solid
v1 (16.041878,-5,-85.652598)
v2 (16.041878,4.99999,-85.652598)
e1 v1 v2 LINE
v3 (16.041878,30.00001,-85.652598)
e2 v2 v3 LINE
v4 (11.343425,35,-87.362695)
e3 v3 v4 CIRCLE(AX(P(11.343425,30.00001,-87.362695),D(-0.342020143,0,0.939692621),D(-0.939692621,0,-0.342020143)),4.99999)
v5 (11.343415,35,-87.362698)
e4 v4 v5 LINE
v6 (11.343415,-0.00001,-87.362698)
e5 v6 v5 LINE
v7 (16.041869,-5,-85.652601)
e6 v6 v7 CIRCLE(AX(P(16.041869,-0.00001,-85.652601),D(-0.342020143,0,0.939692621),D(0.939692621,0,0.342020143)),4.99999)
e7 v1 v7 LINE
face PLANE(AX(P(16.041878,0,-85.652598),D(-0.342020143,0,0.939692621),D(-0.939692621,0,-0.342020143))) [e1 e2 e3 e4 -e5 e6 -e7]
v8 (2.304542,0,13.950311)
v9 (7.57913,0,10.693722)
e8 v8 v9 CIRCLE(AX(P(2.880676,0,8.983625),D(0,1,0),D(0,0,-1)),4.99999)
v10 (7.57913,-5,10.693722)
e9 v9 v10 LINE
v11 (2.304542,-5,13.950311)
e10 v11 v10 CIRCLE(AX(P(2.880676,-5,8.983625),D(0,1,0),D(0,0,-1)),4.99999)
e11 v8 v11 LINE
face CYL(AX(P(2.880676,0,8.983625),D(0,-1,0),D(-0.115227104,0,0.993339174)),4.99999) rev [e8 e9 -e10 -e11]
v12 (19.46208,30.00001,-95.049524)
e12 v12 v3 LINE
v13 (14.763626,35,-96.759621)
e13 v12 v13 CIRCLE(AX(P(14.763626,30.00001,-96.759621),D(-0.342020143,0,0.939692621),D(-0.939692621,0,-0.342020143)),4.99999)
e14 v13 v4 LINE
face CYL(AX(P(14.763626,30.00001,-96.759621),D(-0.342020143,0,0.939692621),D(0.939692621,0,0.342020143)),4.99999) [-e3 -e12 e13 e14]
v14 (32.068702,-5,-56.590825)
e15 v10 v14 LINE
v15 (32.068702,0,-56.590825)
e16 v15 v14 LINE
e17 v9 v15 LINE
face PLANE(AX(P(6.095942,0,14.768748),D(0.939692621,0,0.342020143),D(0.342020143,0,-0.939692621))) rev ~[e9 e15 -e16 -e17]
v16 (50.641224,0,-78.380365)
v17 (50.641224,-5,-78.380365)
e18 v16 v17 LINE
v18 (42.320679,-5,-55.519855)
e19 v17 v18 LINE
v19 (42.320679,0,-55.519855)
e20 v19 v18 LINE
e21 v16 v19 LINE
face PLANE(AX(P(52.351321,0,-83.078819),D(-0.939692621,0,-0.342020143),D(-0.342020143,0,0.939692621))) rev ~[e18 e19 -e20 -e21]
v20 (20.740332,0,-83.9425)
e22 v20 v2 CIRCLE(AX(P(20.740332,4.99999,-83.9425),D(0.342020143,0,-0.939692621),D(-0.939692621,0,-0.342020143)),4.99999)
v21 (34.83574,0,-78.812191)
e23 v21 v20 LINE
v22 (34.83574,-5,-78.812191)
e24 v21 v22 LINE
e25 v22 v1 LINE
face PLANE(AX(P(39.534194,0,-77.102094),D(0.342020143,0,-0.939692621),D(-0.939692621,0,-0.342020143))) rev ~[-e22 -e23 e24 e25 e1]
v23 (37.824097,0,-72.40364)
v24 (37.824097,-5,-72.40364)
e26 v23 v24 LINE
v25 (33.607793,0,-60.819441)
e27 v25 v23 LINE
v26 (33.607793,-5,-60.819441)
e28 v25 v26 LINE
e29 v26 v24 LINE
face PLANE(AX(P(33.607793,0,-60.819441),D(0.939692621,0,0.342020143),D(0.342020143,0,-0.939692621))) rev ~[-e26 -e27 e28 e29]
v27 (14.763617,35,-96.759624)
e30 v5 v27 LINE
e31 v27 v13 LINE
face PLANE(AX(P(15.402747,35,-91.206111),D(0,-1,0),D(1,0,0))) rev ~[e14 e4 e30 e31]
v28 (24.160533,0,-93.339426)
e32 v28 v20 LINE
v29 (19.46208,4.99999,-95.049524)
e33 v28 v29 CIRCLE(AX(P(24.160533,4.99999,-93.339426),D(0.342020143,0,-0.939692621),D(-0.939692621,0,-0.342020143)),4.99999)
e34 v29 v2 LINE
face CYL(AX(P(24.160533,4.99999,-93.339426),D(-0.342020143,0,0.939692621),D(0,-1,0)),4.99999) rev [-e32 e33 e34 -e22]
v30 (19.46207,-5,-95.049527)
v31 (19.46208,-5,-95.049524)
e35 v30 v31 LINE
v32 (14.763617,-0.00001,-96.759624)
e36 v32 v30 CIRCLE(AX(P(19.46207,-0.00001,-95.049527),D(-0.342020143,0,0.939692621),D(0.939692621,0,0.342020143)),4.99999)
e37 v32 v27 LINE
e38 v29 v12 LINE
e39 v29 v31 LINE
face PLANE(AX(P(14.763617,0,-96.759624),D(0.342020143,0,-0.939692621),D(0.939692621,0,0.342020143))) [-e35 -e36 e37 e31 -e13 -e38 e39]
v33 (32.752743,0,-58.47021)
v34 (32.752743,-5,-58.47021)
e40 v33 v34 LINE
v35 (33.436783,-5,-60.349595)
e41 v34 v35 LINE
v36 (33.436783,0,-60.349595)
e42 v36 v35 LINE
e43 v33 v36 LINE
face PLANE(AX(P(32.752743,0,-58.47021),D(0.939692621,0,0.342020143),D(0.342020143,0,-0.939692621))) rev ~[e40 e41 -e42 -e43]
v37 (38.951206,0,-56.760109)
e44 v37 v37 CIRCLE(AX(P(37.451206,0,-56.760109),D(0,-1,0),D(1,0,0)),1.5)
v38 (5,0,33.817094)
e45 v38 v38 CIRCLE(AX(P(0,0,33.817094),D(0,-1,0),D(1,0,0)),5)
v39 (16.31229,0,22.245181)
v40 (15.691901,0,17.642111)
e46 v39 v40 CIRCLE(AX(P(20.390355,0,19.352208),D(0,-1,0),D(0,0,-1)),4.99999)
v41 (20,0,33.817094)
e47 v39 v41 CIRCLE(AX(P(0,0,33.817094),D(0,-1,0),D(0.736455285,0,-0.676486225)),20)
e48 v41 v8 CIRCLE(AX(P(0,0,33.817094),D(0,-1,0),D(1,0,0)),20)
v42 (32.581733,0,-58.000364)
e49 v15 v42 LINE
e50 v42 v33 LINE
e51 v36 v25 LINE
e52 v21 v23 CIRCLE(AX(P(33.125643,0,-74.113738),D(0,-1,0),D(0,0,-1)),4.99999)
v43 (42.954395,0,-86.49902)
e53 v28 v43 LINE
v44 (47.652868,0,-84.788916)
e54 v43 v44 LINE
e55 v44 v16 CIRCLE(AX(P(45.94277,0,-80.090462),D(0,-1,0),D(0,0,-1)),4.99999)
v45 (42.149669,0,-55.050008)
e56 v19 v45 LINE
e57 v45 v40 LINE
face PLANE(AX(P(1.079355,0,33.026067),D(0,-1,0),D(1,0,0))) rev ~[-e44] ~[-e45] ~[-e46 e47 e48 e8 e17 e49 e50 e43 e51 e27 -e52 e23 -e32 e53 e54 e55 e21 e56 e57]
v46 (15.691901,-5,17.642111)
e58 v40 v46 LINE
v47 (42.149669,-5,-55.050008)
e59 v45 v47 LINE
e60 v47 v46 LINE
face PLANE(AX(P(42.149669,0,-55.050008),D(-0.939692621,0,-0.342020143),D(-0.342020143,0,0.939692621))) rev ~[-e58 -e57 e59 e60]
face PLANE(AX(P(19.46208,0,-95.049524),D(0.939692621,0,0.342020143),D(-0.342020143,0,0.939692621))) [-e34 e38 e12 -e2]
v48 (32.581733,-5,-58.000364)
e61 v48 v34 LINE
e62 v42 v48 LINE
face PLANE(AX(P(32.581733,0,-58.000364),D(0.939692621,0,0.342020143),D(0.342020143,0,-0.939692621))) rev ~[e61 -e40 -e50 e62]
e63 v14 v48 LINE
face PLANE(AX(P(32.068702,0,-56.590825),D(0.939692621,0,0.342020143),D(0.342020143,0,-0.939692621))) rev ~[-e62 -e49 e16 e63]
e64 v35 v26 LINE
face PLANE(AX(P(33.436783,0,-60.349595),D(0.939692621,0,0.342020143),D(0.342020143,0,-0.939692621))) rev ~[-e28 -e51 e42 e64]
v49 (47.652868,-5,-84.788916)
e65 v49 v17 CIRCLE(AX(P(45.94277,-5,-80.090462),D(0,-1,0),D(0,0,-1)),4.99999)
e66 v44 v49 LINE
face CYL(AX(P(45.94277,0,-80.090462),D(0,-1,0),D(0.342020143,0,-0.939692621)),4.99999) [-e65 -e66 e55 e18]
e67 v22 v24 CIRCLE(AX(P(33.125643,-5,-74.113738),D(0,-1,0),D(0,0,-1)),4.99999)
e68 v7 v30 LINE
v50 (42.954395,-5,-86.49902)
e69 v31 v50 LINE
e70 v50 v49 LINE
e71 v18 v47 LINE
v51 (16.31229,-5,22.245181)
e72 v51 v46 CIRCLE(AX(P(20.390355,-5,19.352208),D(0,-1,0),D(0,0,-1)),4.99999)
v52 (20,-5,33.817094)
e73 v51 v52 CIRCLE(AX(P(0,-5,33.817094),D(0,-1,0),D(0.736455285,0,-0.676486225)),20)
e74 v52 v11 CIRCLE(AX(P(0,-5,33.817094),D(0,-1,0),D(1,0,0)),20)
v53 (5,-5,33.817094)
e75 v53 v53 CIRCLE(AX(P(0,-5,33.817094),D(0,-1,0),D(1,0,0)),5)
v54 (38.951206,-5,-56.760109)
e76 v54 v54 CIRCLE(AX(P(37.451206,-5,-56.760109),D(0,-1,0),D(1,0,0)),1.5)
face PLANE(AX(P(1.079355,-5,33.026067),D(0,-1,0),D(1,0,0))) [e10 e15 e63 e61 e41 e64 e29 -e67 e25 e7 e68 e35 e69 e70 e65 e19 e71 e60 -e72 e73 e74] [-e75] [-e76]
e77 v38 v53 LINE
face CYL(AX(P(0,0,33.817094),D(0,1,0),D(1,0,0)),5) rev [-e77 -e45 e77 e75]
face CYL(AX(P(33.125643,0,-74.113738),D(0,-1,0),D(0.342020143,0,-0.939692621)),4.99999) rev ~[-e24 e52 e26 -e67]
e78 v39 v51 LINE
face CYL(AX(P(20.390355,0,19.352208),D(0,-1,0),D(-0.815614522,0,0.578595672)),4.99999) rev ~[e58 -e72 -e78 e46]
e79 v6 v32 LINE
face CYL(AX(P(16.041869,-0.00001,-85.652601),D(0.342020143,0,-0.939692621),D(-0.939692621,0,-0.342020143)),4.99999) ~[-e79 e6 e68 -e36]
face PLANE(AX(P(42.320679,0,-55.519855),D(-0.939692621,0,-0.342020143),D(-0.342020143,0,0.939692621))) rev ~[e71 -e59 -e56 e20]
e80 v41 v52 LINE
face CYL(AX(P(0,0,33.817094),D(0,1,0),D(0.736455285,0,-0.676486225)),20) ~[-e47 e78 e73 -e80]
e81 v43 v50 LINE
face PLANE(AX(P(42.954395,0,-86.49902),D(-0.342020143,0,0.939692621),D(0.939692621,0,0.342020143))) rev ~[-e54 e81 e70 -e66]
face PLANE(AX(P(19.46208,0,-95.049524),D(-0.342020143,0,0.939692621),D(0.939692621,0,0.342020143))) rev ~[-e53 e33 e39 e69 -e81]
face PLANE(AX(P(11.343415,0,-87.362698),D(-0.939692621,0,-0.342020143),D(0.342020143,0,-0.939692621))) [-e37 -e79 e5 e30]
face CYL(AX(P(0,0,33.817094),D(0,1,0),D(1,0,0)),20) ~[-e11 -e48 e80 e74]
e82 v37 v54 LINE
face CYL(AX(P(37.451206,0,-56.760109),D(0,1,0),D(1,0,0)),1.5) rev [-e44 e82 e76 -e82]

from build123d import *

# Parameters (mm, degrees)
F0_R     = 5
F0_R_2   = 1.5
F1_DEPTH = 5
F2_DEPTH = 35
F3_R     = 4.99999


# Not quite as in the source:
# - a fillet or chamfer is up to 0.001 mm smaller than in the source, because OpenCascade refuses the exact size


with BuildPart() as f1:
    # F0 (on Front) → F1 (new body)
    with BuildSketch(Plane.XZ):
        with BuildLine():
            ThreePointArc((14.7291057085, 20.287369527), (18.6357467541, 26.5570015397), (20, 33.8170940264))
            ThreePointArc((20, 33.8170940264), (-16.154238453, 45.6086409989), (6.0959419995, 14.7687478741))
            ThreePointArc((6.0959419995, 14.7687478741), (10.7719287617, 16.9658166044), (14.7291057085, 20.287369527))
        make_face()
        with Locations((0, 33.8170940264)):
            Circle(F0_R, mode=Mode.SUBTRACT)
        with BuildLine():
            ThreePointArc((14.7291057085, 20.287369527), (10.7719287617, 16.9658166044), (6.0959419995, 14.7687478741))
            Line((6.0959419995, 14.7687478741), (32.0687023036, -56.5908245822))
            Line((32.0687023036, -56.5908245822), (32.4609528428, -56.4480570615))
            ThreePointArc((32.4609528428, -56.4480570615), (36.7371185385, -51.8113638587), (42.1496687351, -55.0500082175))
            Line((42.1496687351, -55.0500082175), (14.7291057085, 20.287369527))
        make_face()
        with BuildLine():
            Line((32.4609528428, -56.4480570615), (32.0687023036, -56.5908245822))
            Line((32.0687023036, -56.5908245822), (32.5817325186, -58.0003635134))
            Line((32.5817325186, -58.0003635134), (32.7527425708, -58.4702097705))
            ThreePointArc((32.7527425708, -58.4702097705), (32.5024604285, -57.4741961437), (32.4609528428, -56.4480570615))
        make_face()
        with BuildLine():
            ThreePointArc((33.8290334161, -60.2068275447), (33.2012405538, -59.3940787929), (32.7527425708, -58.4702097705))
            Line((32.7527425708, -58.4702097705), (33.4367828769, -60.3495950653))
            Line((33.4367828769, -60.3495950653), (33.8290334161, -60.2068275447))
        make_face()
        with BuildLine():
            ThreePointArc((42.4512056942, -56.7601091071), (42.3752444432, -55.8918681281), (42.1496687351, -55.0500082175))
            ThreePointArc((42.1496687351, -55.0500082175), (36.7371185385, -51.8113638587), (32.4609528428, -56.4480570615))
            ThreePointArc((32.4609528428, -56.4480570615), (32.5024604285, -57.4741961437), (32.7527425708, -58.4702097705))
            ThreePointArc((32.7527425708, -58.4702097705), (33.2012405538, -59.3940787929), (33.8290334161, -60.2068275447))
            ThreePointArc((33.8290334161, -60.2068275447), (39.3071607865, -61.4028917528), (42.4512056942, -56.7601091071))
        make_face()
        with Locations((37.4512056942, -56.7601091071)):
            Circle(F0_R_2, mode=Mode.SUBTRACT)
        with BuildLine():
            Line((42.3206788698, -55.5198547009), (42.1496687351, -55.0500082175))
            ThreePointArc((42.1496687351, -55.0500082175), (42.3752444432, -55.8918681281), (42.4512056942, -56.7601091071))
            ThreePointArc((42.4512056942, -56.7601091071), (39.3071607865, -61.4028917528), (33.8290334161, -60.2068275447))
            Line((33.8290334161, -60.2068275447), (33.4367828769, -60.3495950653))
            Line((33.4367828769, -60.3495950653), (33.6077929485, -60.8194413757))
            Line((33.6077929485, -60.8194413757), (39.5341938332, -77.1020939848))
            Line((39.5341938332, -77.1020939848), (42.9543952664, -86.4990201927))
            Line((42.9543952664, -86.4990201927), (52.3513214743, -83.0788187594))
            Line((52.3513214743, -83.0788187594), (42.3206788698, -55.5198547009))
        make_face()
        Polygon((19.4620797468, -95.0495237758), (42.9543952664, -86.4990201927), (39.5341938332, -77.1020939848), (16.0418783135, -85.652597568), align=None)
        Polygon((14.7636166428, -96.7596244924), (19.4620797468, -95.0495237758), (16.0418783135, -85.652597568), (11.3434152096, -87.3626982846), align=None)
    extrude(amount=F1_DEPTH)

    # F0 (on Front) → F2 (join)
    with BuildSketch(Plane.XZ):
        Polygon((14.7636166428, -96.7596244924), (19.4620797468, -95.0495237758), (16.0418783135, -85.652597568), (11.3434152096, -87.3626982846), align=None)
    extrude(amount=-F2_DEPTH)

    # F3 (radius 5 in the source; OpenCascade refuses exactly that, so slightly less here)
    f3_edges = [f1.edges().sort_by_distance(p)[0] for p in [
        (6.095942, -2.5, 14.768748),
        (14.729106, -2.5, 20.28737),
        (52.351321, -2.5, -83.078819),
        (17.751979, 0, -90.351061),
        (13.053516, -5, -92.061161),
        (39.534194, -2.5, -77.102094),
        (17.751979, 35, -90.351061),
    ]]
    fillet(f3_edges, radius=F3_R)


solid = f1.part
